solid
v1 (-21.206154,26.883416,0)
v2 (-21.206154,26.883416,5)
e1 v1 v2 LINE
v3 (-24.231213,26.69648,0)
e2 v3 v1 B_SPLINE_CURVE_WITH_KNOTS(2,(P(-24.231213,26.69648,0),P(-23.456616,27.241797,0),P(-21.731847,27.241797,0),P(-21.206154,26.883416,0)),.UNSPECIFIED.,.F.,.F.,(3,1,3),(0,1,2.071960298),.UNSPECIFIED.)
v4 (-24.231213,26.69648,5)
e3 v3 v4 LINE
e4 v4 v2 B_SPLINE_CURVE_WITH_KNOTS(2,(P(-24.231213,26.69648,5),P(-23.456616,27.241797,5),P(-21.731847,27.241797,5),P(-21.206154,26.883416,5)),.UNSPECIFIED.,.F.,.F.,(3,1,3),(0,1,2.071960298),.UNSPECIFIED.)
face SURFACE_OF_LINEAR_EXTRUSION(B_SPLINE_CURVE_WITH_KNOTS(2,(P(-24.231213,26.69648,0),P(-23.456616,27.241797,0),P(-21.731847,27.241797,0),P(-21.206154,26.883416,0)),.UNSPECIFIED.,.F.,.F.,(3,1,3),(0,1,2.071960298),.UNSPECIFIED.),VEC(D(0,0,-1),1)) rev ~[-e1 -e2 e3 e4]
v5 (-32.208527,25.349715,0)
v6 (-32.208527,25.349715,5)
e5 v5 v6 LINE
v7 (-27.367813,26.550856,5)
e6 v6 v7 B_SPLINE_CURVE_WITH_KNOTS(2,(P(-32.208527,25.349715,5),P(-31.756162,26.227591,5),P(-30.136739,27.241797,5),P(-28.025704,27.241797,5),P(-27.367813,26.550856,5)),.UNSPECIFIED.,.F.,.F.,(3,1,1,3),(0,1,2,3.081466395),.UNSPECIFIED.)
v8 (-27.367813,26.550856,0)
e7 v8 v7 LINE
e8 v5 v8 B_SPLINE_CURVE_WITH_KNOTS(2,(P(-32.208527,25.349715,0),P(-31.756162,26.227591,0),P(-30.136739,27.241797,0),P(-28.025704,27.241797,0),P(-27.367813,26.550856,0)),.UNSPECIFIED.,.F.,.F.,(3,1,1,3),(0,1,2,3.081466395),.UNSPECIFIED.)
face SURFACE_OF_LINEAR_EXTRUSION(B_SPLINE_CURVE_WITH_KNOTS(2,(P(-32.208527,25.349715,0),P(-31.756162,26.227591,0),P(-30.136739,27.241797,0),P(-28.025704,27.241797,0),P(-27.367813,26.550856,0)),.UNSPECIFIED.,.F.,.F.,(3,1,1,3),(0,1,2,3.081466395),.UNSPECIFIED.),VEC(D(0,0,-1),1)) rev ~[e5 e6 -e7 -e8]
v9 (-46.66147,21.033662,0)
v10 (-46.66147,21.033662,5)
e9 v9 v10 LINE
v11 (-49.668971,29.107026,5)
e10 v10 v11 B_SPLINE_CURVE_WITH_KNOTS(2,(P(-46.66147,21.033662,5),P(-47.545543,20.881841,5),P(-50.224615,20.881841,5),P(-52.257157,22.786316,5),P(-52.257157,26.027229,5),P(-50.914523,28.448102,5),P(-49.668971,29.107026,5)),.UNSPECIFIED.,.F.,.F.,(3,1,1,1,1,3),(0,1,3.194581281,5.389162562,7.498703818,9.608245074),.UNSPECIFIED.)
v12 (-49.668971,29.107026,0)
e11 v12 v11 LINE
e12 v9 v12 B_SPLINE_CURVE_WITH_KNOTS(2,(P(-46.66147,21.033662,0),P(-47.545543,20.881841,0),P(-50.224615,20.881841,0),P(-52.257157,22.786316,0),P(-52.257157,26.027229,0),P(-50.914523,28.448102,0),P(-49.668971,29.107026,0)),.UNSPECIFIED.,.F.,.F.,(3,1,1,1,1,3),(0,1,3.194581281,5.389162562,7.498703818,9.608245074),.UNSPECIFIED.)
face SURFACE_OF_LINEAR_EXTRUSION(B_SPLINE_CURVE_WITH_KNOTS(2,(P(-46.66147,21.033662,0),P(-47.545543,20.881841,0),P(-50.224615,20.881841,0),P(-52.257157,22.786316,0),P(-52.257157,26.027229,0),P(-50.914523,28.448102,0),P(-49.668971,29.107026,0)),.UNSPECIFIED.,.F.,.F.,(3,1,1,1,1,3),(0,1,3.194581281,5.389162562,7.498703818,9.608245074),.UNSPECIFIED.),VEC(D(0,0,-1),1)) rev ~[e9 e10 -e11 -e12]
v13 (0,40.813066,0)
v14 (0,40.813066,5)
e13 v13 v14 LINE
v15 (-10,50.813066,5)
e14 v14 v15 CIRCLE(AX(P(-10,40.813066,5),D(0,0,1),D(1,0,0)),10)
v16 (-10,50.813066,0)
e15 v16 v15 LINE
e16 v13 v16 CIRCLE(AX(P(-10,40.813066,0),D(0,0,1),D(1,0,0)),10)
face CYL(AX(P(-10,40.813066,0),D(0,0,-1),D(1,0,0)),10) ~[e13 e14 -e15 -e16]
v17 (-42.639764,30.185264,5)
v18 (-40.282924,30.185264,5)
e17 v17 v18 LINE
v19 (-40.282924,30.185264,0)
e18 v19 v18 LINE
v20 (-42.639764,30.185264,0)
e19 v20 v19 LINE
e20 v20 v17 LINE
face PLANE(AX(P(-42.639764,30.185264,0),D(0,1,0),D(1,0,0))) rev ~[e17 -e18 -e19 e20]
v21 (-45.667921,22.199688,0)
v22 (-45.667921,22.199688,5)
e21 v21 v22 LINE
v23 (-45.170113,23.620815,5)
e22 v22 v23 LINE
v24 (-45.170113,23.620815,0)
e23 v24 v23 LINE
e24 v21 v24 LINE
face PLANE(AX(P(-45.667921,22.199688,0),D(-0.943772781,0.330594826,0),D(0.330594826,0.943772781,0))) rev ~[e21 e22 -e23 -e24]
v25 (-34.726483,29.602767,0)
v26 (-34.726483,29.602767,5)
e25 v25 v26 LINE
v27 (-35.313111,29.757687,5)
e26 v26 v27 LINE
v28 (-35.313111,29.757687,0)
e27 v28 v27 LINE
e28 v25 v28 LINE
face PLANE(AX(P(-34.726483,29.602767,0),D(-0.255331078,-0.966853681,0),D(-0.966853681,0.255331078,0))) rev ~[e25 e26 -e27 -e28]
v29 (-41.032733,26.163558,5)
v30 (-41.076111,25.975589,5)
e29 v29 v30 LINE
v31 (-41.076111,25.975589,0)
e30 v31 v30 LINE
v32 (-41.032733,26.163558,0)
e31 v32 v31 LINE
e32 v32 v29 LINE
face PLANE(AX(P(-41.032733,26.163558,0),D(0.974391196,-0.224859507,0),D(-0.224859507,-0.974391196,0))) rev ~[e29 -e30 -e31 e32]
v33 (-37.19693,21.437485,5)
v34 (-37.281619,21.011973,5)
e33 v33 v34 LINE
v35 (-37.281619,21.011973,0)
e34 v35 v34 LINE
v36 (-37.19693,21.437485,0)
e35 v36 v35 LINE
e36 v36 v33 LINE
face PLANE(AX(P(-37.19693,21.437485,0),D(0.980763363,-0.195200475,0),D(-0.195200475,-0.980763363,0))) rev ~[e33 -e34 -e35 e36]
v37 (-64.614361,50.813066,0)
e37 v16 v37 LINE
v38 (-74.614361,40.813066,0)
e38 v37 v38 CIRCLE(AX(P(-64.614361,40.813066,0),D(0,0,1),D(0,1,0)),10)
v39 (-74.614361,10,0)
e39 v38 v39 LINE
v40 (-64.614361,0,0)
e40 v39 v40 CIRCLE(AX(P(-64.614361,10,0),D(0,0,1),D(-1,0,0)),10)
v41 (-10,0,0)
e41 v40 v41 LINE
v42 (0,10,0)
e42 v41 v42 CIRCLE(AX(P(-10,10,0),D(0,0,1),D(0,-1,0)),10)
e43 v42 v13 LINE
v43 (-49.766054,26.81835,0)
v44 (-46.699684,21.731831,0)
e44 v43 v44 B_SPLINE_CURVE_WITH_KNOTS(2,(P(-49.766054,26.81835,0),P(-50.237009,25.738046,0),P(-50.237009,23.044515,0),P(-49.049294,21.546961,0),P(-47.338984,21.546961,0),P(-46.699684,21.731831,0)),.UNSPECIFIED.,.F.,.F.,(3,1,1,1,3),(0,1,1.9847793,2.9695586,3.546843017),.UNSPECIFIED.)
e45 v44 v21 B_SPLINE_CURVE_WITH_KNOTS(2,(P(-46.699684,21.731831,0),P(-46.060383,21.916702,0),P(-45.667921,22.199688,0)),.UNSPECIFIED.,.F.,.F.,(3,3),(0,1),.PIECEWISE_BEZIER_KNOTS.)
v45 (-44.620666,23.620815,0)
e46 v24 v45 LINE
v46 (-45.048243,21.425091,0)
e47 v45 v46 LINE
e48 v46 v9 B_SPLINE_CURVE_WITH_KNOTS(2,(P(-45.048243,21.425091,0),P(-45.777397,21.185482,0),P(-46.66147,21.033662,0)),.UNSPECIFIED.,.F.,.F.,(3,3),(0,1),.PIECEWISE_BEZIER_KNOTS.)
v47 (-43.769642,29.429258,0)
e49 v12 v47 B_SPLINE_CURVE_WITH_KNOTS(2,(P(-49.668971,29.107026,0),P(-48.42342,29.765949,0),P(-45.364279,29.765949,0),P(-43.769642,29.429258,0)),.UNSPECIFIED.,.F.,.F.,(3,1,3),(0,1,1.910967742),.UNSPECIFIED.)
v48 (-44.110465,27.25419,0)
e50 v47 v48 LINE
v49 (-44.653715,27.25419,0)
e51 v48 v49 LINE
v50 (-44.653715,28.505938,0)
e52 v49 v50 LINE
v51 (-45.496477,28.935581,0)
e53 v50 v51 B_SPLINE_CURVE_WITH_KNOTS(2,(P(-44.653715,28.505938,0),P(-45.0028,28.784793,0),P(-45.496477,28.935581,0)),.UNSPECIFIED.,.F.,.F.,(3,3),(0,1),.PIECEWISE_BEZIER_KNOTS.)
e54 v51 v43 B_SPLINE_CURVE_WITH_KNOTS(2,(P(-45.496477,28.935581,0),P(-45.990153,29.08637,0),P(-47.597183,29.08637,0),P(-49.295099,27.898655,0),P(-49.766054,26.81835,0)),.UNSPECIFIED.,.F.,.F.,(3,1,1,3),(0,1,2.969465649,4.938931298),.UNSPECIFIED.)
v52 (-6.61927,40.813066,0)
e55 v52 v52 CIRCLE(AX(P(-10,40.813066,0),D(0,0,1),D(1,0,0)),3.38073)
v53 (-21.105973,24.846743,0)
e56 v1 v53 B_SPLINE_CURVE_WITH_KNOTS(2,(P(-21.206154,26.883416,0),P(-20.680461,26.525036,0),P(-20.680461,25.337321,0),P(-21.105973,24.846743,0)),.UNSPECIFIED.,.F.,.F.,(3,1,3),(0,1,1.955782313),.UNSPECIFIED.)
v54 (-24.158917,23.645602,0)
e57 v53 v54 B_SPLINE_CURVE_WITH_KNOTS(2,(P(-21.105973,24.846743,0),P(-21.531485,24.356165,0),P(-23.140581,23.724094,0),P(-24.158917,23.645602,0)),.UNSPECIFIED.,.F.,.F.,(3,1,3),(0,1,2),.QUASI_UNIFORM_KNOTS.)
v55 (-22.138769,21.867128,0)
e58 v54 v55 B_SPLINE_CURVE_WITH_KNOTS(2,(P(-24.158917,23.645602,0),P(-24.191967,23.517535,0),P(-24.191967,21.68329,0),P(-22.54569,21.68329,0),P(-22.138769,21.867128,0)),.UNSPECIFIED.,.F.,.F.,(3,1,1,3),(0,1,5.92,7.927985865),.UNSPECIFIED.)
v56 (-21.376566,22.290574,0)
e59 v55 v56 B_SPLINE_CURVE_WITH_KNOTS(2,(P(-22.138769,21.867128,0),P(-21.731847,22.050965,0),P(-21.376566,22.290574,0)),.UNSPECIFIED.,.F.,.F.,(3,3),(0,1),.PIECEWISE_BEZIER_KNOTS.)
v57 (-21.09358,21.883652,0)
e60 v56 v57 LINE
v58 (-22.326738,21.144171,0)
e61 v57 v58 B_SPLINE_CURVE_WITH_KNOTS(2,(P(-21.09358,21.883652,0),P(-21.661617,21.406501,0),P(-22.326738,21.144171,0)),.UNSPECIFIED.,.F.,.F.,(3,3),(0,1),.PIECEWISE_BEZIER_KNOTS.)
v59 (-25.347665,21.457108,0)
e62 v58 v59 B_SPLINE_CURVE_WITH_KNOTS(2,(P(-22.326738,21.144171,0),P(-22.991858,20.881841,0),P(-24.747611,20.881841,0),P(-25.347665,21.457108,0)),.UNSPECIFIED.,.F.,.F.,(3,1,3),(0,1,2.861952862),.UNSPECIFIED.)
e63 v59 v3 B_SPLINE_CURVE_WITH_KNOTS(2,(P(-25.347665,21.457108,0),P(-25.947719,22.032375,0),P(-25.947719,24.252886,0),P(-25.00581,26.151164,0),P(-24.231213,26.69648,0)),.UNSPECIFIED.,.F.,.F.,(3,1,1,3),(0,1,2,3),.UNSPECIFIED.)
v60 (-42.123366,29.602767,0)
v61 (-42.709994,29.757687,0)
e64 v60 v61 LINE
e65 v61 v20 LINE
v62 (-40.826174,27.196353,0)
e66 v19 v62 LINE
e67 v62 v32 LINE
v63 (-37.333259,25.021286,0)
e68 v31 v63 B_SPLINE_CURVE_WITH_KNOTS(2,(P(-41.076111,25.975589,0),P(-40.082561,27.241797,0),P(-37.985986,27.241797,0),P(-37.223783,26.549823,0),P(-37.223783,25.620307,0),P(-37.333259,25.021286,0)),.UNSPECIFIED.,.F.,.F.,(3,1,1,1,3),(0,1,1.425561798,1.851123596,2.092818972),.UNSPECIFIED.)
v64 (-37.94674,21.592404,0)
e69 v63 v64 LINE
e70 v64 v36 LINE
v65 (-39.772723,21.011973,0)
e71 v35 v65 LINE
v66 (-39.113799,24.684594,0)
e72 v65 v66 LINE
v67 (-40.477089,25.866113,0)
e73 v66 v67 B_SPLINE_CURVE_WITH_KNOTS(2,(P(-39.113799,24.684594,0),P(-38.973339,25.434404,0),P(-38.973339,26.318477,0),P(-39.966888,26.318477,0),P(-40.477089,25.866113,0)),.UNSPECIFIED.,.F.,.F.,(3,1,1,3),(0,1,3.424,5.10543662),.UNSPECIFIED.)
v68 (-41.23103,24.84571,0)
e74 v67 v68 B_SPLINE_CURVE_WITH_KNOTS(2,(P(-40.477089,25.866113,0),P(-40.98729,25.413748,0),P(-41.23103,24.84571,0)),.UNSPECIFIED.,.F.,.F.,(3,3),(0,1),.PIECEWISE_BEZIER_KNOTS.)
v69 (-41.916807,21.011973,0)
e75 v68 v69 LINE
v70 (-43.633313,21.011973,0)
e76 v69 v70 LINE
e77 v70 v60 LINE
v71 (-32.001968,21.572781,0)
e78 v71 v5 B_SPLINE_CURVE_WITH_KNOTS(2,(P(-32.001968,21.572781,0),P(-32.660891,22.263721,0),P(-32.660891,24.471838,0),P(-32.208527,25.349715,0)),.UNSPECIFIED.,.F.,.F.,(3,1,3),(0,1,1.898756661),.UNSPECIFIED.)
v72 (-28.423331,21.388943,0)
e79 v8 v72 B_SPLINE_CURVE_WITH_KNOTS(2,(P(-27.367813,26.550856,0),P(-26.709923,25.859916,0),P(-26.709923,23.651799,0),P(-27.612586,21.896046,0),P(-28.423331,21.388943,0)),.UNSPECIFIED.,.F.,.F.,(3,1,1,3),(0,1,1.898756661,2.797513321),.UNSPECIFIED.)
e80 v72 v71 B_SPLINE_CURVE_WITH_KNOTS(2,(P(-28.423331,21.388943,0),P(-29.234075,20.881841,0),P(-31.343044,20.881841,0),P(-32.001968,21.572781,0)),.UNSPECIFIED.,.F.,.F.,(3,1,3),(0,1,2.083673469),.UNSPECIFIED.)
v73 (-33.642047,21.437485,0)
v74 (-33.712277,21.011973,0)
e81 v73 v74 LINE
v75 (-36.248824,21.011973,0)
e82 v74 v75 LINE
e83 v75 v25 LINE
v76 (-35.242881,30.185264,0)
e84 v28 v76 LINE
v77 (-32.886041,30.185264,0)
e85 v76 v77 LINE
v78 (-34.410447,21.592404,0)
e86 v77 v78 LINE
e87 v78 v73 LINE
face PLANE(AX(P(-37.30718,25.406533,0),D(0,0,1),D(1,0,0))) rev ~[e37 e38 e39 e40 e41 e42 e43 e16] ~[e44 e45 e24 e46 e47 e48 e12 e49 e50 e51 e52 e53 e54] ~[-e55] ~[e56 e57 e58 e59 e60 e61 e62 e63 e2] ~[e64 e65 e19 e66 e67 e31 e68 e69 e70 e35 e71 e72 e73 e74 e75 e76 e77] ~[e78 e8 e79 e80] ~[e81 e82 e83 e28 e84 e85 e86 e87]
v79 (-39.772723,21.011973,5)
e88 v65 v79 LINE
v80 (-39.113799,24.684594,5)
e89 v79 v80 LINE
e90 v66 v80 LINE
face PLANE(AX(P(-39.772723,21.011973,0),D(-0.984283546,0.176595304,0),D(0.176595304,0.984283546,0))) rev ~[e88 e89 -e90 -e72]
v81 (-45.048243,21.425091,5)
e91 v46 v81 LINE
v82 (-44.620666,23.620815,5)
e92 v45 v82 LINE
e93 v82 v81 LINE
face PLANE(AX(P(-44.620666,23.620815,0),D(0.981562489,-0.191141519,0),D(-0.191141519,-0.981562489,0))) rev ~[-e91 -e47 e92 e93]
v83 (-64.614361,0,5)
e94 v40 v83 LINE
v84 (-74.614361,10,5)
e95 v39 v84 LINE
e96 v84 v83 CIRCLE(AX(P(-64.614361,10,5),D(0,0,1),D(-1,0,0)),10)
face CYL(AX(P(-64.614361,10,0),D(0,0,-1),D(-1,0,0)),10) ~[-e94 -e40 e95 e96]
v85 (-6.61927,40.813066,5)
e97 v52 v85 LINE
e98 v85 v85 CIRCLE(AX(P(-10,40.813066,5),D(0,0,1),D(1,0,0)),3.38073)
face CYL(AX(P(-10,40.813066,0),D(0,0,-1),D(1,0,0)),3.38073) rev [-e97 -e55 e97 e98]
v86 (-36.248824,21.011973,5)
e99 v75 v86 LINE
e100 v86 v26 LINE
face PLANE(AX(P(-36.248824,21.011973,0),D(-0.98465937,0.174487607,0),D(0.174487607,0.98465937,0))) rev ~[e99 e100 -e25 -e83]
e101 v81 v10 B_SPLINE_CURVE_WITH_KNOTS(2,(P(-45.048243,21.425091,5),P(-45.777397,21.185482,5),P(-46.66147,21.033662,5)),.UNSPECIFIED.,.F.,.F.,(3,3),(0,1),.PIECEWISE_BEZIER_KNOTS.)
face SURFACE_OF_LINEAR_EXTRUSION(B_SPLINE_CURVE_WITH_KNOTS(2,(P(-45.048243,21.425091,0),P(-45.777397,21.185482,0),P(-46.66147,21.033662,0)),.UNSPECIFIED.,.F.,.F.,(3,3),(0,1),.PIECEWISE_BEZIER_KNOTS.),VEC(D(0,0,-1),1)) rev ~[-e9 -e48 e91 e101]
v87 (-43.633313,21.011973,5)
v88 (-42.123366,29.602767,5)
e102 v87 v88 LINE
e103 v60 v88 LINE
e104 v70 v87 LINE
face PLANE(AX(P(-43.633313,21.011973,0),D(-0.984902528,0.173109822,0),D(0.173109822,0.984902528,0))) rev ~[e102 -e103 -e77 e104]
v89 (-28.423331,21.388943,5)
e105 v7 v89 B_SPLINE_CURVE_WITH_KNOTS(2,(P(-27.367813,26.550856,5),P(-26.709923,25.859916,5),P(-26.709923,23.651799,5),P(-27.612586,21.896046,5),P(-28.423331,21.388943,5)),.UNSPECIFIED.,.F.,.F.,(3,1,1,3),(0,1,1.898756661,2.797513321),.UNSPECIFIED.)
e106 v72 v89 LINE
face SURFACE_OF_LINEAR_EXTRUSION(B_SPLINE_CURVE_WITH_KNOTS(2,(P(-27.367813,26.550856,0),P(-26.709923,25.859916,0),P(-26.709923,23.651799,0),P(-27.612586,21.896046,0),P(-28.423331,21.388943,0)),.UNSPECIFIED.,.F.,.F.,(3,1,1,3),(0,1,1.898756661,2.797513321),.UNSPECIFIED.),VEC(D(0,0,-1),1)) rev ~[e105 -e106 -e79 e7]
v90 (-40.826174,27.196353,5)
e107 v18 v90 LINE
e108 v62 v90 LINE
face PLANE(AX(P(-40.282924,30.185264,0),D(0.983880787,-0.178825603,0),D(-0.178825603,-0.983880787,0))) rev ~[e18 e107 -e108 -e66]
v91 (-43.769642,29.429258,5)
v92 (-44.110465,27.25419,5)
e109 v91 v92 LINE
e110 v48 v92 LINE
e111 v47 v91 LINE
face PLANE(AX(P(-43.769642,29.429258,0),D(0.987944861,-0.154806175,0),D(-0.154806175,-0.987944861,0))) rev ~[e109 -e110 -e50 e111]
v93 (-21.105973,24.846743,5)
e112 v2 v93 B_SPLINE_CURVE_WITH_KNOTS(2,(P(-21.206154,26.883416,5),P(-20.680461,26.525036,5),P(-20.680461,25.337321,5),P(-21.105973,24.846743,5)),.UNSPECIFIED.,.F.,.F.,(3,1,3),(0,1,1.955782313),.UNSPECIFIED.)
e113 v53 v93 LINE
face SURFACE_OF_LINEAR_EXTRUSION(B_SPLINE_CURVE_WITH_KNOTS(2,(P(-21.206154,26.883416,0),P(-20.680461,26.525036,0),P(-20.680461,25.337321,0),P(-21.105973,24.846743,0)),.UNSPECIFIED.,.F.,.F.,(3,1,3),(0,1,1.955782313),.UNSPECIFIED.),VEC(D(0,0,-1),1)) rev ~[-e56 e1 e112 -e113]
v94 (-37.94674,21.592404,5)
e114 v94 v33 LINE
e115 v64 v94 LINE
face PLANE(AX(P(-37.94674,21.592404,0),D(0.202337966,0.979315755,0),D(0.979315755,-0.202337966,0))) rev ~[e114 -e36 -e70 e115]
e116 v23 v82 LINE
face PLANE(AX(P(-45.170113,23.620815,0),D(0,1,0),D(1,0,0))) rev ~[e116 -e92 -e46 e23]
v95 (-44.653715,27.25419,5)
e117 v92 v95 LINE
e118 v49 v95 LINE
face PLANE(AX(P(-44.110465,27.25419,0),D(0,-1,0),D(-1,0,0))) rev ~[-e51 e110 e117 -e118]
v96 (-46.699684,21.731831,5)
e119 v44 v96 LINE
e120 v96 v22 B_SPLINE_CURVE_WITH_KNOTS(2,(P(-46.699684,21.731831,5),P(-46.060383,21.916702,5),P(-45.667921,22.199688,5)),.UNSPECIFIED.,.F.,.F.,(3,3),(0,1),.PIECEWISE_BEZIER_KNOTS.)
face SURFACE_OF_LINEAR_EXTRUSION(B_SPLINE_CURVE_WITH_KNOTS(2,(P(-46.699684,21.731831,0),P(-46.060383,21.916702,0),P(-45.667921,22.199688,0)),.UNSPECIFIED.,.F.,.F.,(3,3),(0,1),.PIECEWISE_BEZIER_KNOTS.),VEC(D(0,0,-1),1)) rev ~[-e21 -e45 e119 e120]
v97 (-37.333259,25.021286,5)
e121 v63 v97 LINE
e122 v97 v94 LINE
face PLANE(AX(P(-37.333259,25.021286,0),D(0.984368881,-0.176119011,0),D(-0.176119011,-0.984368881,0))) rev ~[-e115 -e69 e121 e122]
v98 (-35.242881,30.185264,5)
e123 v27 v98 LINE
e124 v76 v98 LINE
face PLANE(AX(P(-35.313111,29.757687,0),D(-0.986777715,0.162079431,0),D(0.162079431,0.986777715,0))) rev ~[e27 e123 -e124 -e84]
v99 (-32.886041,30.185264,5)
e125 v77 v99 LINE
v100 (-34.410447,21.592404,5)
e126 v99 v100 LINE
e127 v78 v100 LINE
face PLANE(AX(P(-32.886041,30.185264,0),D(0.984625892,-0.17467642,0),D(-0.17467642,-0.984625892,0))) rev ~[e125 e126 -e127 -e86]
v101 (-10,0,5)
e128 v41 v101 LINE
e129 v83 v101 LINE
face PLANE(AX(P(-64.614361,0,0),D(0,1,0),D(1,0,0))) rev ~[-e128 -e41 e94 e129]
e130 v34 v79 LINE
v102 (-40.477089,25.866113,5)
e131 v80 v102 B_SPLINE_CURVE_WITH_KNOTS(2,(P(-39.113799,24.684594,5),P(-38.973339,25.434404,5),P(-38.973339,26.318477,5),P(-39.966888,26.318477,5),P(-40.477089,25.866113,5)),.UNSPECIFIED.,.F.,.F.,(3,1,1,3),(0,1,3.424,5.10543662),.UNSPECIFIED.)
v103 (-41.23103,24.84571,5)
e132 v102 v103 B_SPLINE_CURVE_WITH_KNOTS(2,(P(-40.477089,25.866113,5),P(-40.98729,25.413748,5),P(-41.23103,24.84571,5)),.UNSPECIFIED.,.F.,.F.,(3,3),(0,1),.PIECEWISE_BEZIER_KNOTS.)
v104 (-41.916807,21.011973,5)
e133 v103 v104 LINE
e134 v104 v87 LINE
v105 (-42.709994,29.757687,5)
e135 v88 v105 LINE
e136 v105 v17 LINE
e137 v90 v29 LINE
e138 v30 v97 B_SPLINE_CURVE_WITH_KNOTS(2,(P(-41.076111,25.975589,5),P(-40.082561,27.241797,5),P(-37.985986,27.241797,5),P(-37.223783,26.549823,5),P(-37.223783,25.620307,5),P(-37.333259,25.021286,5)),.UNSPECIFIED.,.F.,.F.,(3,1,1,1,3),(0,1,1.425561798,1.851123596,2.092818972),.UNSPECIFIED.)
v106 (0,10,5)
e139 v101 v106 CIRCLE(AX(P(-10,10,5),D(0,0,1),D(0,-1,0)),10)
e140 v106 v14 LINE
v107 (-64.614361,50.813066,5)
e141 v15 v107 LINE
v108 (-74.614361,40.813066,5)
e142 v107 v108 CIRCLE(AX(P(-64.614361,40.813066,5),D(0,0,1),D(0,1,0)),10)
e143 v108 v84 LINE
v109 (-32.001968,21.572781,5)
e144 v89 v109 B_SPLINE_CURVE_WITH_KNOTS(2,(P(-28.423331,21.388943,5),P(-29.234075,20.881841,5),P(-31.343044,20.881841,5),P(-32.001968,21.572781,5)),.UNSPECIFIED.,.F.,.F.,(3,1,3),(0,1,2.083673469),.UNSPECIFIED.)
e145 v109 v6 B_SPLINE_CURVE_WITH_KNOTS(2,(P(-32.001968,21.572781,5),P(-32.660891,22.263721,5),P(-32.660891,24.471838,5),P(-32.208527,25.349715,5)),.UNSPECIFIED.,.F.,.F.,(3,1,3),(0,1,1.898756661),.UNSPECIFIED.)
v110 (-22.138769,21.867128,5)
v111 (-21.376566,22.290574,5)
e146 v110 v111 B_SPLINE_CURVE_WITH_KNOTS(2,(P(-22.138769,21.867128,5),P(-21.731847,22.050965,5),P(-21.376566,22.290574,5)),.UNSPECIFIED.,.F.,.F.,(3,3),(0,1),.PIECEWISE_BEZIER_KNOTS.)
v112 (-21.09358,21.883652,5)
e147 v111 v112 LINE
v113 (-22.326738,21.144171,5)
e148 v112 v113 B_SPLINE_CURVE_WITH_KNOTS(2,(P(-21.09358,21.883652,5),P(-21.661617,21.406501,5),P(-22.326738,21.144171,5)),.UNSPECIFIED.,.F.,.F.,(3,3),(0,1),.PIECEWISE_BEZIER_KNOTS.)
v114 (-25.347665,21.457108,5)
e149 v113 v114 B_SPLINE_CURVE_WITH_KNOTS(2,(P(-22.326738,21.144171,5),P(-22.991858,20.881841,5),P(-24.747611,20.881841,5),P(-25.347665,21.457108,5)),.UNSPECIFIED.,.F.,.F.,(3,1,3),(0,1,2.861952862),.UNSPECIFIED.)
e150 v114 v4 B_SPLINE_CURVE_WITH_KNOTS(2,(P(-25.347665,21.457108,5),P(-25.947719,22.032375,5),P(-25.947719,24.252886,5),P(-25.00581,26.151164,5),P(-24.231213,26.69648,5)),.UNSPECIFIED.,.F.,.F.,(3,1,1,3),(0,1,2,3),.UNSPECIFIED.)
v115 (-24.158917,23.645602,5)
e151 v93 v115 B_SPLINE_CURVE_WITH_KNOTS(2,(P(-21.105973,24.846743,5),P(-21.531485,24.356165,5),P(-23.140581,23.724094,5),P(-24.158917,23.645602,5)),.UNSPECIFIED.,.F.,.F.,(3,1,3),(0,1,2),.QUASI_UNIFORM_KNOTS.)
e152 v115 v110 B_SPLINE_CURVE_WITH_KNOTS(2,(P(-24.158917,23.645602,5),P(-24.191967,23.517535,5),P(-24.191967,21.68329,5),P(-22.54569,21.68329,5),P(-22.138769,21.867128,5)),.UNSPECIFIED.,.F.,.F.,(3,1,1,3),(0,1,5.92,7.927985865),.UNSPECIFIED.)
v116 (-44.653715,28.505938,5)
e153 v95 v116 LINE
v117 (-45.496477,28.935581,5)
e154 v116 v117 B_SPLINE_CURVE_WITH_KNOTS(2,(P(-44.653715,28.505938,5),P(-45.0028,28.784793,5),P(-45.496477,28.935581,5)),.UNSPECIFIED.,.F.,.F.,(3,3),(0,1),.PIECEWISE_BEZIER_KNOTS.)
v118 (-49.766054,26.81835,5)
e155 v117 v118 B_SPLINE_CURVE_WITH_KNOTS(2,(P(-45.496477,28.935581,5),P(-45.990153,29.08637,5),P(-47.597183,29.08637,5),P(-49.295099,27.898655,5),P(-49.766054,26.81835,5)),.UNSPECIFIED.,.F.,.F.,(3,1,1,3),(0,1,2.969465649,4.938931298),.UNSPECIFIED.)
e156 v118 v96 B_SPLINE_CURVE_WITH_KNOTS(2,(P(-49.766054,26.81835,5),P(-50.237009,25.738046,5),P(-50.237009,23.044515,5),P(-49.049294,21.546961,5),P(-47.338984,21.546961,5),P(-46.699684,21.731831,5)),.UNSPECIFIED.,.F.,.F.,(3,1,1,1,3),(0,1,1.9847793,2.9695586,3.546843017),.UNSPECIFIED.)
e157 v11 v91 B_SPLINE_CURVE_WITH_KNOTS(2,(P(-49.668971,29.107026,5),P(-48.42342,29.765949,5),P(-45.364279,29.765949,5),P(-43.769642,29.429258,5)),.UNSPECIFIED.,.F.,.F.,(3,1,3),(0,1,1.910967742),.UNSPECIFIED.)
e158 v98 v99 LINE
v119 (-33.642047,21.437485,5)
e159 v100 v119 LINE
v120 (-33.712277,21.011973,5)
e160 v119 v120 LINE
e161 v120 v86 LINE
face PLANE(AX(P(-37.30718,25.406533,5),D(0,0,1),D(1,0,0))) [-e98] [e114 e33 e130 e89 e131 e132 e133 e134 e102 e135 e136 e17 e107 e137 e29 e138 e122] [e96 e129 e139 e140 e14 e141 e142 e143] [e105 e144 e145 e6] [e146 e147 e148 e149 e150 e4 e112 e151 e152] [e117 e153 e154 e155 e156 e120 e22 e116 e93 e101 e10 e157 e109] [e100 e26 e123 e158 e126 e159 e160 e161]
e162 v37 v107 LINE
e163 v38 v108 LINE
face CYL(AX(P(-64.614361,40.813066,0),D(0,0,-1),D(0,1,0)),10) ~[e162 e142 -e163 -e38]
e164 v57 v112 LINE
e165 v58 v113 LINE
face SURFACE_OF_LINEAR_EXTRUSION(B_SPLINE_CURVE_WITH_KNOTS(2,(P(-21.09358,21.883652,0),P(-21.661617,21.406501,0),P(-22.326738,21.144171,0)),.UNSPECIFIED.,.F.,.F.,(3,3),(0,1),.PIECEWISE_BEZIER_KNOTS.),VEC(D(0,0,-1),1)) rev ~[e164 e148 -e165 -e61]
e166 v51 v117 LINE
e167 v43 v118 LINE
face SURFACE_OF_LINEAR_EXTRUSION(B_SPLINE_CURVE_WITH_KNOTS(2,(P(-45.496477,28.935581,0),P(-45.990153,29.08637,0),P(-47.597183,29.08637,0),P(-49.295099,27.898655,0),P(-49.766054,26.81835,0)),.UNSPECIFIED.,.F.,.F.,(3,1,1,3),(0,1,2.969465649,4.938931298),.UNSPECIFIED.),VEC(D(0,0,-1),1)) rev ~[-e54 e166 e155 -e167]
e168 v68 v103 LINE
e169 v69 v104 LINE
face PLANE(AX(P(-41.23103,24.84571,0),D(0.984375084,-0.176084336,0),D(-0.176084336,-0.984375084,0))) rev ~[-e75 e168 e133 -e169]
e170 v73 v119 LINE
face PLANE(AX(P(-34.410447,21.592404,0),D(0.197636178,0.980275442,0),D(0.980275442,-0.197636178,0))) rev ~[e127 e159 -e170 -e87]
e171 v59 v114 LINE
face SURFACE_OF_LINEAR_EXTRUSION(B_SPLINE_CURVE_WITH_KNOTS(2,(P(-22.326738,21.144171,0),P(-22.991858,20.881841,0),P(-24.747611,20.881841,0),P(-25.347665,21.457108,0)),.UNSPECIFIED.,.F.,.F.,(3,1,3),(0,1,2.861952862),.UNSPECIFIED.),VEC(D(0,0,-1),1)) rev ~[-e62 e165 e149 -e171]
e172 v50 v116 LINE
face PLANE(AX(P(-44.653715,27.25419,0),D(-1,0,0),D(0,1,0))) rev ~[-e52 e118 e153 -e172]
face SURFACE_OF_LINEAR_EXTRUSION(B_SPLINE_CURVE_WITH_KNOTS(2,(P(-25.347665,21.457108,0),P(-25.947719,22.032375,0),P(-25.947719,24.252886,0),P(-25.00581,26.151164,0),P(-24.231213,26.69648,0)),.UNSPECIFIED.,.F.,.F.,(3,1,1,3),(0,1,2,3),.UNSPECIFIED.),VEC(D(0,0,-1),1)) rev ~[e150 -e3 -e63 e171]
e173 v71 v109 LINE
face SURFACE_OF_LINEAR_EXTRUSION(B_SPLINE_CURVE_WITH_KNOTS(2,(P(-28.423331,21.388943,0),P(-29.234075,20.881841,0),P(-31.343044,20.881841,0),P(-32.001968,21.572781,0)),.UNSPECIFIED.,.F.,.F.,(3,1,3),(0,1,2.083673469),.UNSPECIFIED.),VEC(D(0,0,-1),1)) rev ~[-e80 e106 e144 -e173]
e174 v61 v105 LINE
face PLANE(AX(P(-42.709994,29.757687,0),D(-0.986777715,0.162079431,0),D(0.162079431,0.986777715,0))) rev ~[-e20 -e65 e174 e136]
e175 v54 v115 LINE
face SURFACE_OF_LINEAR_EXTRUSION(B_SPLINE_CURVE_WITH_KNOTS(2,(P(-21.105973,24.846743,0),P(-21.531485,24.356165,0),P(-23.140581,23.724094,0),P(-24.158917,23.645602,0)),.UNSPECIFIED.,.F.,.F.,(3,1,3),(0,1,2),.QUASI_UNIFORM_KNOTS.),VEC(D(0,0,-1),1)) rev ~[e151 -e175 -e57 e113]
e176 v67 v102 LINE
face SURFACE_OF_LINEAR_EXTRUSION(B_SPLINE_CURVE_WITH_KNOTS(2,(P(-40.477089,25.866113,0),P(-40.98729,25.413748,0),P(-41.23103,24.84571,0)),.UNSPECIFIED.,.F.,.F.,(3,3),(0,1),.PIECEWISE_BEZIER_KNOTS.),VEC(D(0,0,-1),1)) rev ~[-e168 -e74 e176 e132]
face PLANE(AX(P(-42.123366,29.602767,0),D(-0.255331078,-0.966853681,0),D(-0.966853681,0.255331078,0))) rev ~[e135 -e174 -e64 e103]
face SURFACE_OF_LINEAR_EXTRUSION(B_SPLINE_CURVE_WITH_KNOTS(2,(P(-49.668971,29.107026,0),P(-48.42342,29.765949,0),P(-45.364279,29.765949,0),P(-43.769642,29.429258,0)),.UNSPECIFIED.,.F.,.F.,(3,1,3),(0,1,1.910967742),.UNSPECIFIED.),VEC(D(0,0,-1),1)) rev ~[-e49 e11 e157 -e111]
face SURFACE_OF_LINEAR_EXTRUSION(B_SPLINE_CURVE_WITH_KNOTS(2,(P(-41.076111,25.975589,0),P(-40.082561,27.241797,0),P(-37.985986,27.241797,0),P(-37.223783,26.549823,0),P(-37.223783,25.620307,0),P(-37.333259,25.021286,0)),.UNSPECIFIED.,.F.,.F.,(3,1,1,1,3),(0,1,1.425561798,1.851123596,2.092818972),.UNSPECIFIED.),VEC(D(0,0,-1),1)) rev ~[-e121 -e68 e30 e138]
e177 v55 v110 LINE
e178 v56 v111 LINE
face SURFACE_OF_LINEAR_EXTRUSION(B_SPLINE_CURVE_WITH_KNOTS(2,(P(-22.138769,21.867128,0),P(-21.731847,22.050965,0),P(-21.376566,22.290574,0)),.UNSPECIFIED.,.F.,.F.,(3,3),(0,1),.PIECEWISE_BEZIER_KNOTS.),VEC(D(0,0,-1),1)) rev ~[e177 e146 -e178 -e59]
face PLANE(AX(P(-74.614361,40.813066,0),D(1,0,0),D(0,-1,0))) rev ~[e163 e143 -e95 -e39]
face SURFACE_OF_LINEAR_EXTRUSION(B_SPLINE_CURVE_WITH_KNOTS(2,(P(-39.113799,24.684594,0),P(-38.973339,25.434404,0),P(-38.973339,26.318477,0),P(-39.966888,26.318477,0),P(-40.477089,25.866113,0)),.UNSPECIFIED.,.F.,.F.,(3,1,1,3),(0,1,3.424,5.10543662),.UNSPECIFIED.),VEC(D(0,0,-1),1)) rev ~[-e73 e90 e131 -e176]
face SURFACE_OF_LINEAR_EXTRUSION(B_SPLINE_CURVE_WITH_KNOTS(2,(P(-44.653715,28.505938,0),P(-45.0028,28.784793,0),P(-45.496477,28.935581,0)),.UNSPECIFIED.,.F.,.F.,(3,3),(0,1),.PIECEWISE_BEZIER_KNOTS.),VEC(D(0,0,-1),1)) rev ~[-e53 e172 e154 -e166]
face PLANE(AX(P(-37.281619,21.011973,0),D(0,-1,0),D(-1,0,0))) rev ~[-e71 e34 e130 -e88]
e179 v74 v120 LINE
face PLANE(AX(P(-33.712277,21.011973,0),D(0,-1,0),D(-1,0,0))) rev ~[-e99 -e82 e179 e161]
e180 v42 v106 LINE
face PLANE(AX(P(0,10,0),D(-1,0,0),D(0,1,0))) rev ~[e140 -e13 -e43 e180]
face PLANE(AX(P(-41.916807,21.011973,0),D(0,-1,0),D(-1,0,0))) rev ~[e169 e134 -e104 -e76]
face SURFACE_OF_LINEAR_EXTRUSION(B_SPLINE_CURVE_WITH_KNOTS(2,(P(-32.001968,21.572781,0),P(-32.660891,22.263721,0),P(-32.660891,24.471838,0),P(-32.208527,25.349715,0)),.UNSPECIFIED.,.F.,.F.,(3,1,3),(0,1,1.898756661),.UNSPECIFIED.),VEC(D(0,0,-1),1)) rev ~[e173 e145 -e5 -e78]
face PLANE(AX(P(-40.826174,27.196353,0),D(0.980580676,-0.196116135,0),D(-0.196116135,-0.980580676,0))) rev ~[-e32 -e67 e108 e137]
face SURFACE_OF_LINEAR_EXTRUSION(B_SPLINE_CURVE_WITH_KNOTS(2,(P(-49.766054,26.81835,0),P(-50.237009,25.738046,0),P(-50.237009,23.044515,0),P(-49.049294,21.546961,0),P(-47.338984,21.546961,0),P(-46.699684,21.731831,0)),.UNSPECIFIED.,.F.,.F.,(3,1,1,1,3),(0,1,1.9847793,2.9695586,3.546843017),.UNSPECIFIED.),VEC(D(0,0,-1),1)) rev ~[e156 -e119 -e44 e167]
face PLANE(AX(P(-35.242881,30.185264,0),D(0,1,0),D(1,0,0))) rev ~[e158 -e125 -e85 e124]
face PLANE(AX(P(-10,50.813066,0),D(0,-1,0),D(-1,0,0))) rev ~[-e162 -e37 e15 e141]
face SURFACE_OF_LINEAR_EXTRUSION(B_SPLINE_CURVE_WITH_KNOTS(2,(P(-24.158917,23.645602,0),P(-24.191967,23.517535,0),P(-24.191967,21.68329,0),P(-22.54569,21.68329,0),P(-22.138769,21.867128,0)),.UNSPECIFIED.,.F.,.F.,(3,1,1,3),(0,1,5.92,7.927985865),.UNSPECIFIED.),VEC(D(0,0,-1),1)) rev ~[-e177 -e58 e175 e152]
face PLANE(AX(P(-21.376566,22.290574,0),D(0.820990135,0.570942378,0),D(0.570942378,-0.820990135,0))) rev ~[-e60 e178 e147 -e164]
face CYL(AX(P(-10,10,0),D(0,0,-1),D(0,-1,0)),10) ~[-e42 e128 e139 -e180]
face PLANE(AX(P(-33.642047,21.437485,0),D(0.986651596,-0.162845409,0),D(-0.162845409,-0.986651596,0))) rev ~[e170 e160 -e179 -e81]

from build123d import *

# Parameters (mm, degrees)
F0_R     = 3.3807298635
F1_DEPTH = 5


with BuildPart() as f1:
    # F0 (on Top) → F1 (new body)
    with BuildSketch(Plane.XY):
        with BuildLine():
            Line((-64.6143609347, 0), (-10, 0))
            ThreePointArc((-10, 0), (-2.9289321881, 2.9289321881), (0, 10))
            Line((0, 10), (0, 40.8130657572))
            ThreePointArc((0, 40.8130657572), (-2.9289321881, 47.8841335691), (-10, 50.8130657572))
            Line((-10, 50.8130657572), (-64.6143609347, 50.8130657572))
            ThreePointArc((-64.6143609347, 50.8130657572), (-71.6854287466, 47.8841335691), (-74.6143609347, 40.8130657572))
            Line((-74.6143609347, 40.8130657572), (-74.6143609347, 10))
            ThreePointArc((-74.6143609347, 10), (-71.6854287466, 2.9289321881), (-64.6143609347, 0))
        make_face()
        with BuildLine():
            add(Edge.make_bspline(
                [(-46.661470066, 21.0336615097), (-47.5455431911, 20.8818405408), (-48.3841733051, 20.8818405408)],
                knots=[0, 0, 0, 1, 1, 1], degree=2))
            add(Edge.make_bspline(
                [(-48.3841733051, 20.8818405408), (-50.2246152549, 20.8818405408), (-51.2408862305, 21.8340781826)],
                knots=[0, 0, 0, 1, 1, 1], degree=2))
            add(Edge.make_bspline(
                [(-51.2408862305, 21.8340781826), (-52.2571572061, 22.7863158244), (-52.2571572061, 24.4387889555)],
                knots=[0, 0, 0, 1, 1, 1], degree=2))
            add(Edge.make_bspline(
                [(-52.2571572061, 24.4387889555), (-52.2571572061, 26.0272287528), (-51.5858399966, 27.2376653213)],
                knots=[0, 0, 0, 1, 1, 1], degree=2))
            add(Edge.make_bspline(
                [(-51.5858399966, 27.2376653213), (-50.9145227871, 28.4481018898), (-49.6689711646, 29.1070255508)],
                knots=[0, 0, 0, 1, 1, 1], degree=2))
            add(Edge.make_bspline(
                [(-49.6689711646, 29.1070255508), (-48.423419542, 29.7659492119), (-46.8225861963, 29.7659492119)],
                knots=[0, 0, 0, 1, 1, 1], degree=2))
            add(Edge.make_bspline(
                [(-46.8225861963, 29.7659492119), (-45.3642786581, 29.7659492119), (-43.7696420866, 29.4292578114)],
                knots=[0, 0, 0, 1, 1, 1], degree=2))
            Line((-43.7696420866, 29.4292578114), (-44.1104646699, 27.2541900526))
            Line((-44.1104646699, 27.2541900526), (-44.6537152117, 27.2541900526))
            Line((-44.6537152117, 27.2541900526), (-44.6537152117, 28.5059384494))
            add(Edge.make_bspline(
                [(-44.6537152117, 28.5059384494), (-45.0028001606, 28.7847932903), (-45.4964765086, 28.9355814635)],
                knots=[0, 0, 0, 1, 1, 1], degree=2))
            add(Edge.make_bspline(
                [(-45.4964765086, 28.9355814635), (-45.9901528565, 29.0863696367), (-46.5313378069, 29.0863696367)],
                knots=[0, 0, 0, 1, 1, 1], degree=2))
            add(Edge.make_bspline(
                [(-46.5313378069, 29.0863696367), (-47.5971829765, 29.0863696367), (-48.4461410476, 28.4925121052)],
                knots=[0, 0, 0, 1, 1, 1], degree=2))
            add(Edge.make_bspline(
                [(-48.4461410476, 28.4925121052), (-49.2950991187, 27.8986545737), (-49.766053961, 26.8183502643)],
                knots=[0, 0, 0, 1, 1, 1], degree=2))
            add(Edge.make_bspline(
                [(-49.766053961, 26.8183502643), (-50.2370088034, 25.7380459548), (-50.2370088034, 24.3809523959)],
                knots=[0, 0, 0, 1, 1, 1], degree=2))
            add(Edge.make_bspline(
                [(-50.2370088034, 24.3809523959), (-50.2370088034, 23.0445147511), (-49.6431512719, 22.2957378636)],
                knots=[0, 0, 0, 1, 1, 1], degree=2))
            add(Edge.make_bspline(
                [(-49.6431512719, 22.2957378636), (-49.0492937404, 21.5469609761), (-47.9710550224, 21.5469609761)],
                knots=[0, 0, 0, 1, 1, 1], degree=2))
            add(Edge.make_bspline(
                [(-47.9710550224, 21.5469609761), (-47.3389840497, 21.5469609761), (-46.6996835071, 21.7318314076)],
                knots=[0, 0, 0, 1, 1, 1], degree=2))
            add(Edge.make_bspline(
                [(-46.6996835071, 21.7318314076), (-46.0603829645, 21.9167018392), (-45.6679205959, 22.1996878629)],
                knots=[0, 0, 0, 1, 1, 1], degree=2))
            Line((-45.6679205959, 22.1996878629), (-45.1701130652, 23.6208147556))
            Line((-45.1701130652, 23.6208147556), (-44.6206657491, 23.6208147556))
            Line((-44.6206657491, 23.6208147556), (-45.0482431718, 21.4250910827))
            add(Edge.make_bspline(
                [(-45.0482431718, 21.4250910827), (-45.7773969408, 21.1854824787), (-46.661470066, 21.0336615097)],
                knots=[0, 0, 0, 1, 1, 1], degree=2))
        make_face(mode=Mode.SUBTRACT)
        with BuildLine():
            add(Edge.make_bspline(
                [(-28.4233306773, 21.3889432329), (-29.2340753072, 20.8818405408), (-30.2462151, 20.8818405408)],
                knots=[0, 0, 0, 1, 1, 1], degree=2))
            add(Edge.make_bspline(
                [(-30.2462151, 20.8818405408), (-31.3430441408, 20.8818405408), (-32.0019678018, 21.5727808688)],
                knots=[0, 0, 0, 1, 1, 1], degree=2))
            add(Edge.make_bspline(
                [(-32.0019678018, 21.5727808688), (-32.6608914628, 22.2637211967), (-32.6608914628, 23.4266491627)],
                knots=[0, 0, 0, 1, 1, 1], degree=2))
            add(Edge.make_bspline(
                [(-32.6608914628, 23.4266491627), (-32.6608914628, 24.4718384181), (-32.2085269432, 25.349714769)],
                knots=[0, 0, 0, 1, 1, 1], degree=2))
            add(Edge.make_bspline(
                [(-32.2085269432, 25.349714769), (-31.7561624235, 26.2275911199), (-30.9464505893, 26.734693812)],
                knots=[0, 0, 0, 1, 1, 1], degree=2))
            add(Edge.make_bspline(
                [(-30.9464505893, 26.734693812), (-30.1367387551, 27.2417965041), (-29.1225333709, 27.2417965041)],
                knots=[0, 0, 0, 1, 1, 1], degree=2))
            add(Edge.make_bspline(
                [(-29.1225333709, 27.2417965041), (-28.0257043301, 27.2417965041), (-27.3678134648, 26.5508561762)],
                knots=[0, 0, 0, 1, 1, 1], degree=2))
            add(Edge.make_bspline(
                [(-27.3678134648, 26.5508561762), (-26.7099225995, 25.8599158482), (-26.7099225995, 24.6969878822)],
                knots=[0, 0, 0, 1, 1, 1], degree=2))
            add(Edge.make_bspline(
                [(-26.7099225995, 24.6969878822), (-26.7099225995, 23.6517986268), (-27.1612543234, 22.7739222759)],
                knots=[0, 0, 0, 1, 1, 1], degree=2))
            add(Edge.make_bspline(
                [(-27.1612543234, 22.7739222759), (-27.6125860473, 21.896045925), (-28.4233306773, 21.3889432329)],
                knots=[0, 0, 0, 1, 1, 1], degree=2))
        make_face(mode=Mode.SUBTRACT)
        with BuildLine():
            add(Edge.make_bspline(
                [(-21.2061542772, 26.8834163938), (-20.6804612624, 26.5250362835), (-20.6804612624, 25.9177524078)],
                knots=[0, 0, 0, 1, 1, 1], degree=2))
            add(Edge.make_bspline(
                [(-20.6804612624, 25.9177524078), (-20.6804612624, 25.3373212205), (-21.1059730937, 24.8467432597)],
                knots=[0, 0, 0, 1, 1, 1], degree=2))
            add(Edge.make_bspline(
                [(-21.1059730937, 24.8467432597), (-21.5314849249, 24.3561652989), (-22.3360327806, 24.0401298126)],
                knots=[0, 0, 0, 1, 1, 1], degree=2))
            add(Edge.make_bspline(
                [(-22.3360327806, 24.0401298126), (-23.1405806363, 23.7240943263), (-24.1589172033, 23.6456018526)],
                knots=[0, 0, 0, 1, 1, 1], degree=2))
            add(Edge.make_bspline(
                [(-24.1589172033, 23.6456018526), (-24.191966666, 23.5175351849), (-24.191966666, 23.2076964728)],
                knots=[0, 0, 0, 1, 1, 1], degree=2))
            add(Edge.make_bspline(
                [(-24.191966666, 23.2076964728), (-24.191966666, 21.6832900094), (-23.0228419257, 21.6832900094)],
                knots=[0, 0, 0, 1, 1, 1], degree=2))
            add(Edge.make_bspline(
                [(-23.0228419257, 21.6832900094), (-22.5456903091, 21.6832900094), (-22.1387688006, 21.8671276452)],
                knots=[0, 0, 0, 1, 1, 1], degree=2))
            add(Edge.make_bspline(
                [(-22.1387688006, 21.8671276452), (-21.7318472921, 22.0509652811), (-21.3765655689, 22.2905738851)],
                knots=[0, 0, 0, 1, 1, 1], degree=2))
            Line((-21.3765655689, 22.2905738851), (-21.0935795452, 21.8836523765))
            add(Edge.make_bspline(
                [(-21.0935795452, 21.8836523765), (-21.661617184, 21.4065007599), (-22.3267376192, 21.1441706504)],
                knots=[0, 0, 0, 1, 1, 1], degree=2))
            add(Edge.make_bspline(
                [(-22.3267376192, 21.1441706504), (-22.9918580545, 20.8818405408), (-23.6053387044, 20.8818405408)],
                knots=[0, 0, 0, 1, 1, 1], degree=2))
            add(Edge.make_bspline(
                [(-23.6053387044, 20.8818405408), (-24.7476107563, 20.8818405408), (-25.347665062, 21.4571077496)],
                knots=[0, 0, 0, 1, 1, 1], degree=2))
            add(Edge.make_bspline(
                [(-25.347665062, 21.4571077496), (-25.9477193678, 22.0323749583), (-25.9477193678, 23.1426303433)],
                knots=[0, 0, 0, 1, 1, 1], degree=2))
            add(Edge.make_bspline(
                [(-25.9477193678, 23.1426303433), (-25.9477193678, 24.2528857282), (-25.4767645254, 25.2020249829)],
                knots=[0, 0, 0, 1, 1, 1], degree=2))
            add(Edge.make_bspline(
                [(-25.4767645254, 25.2020249829), (-25.005809683, 26.1511642376), (-24.2312129028, 26.6964803709)],
                knots=[0, 0, 0, 1, 1, 1], degree=2))
            add(Edge.make_bspline(
                [(-24.2312129028, 26.6964803709), (-23.4566161226, 27.2417965041), (-22.6241827828, 27.2417965041)],
                knots=[0, 0, 0, 1, 1, 1], degree=2))
            add(Edge.make_bspline(
                [(-22.6241827828, 27.2417965041), (-21.7318472921, 27.2417965041), (-21.2061542772, 26.8834163938)],
                knots=[0, 0, 0, 1, 1, 1], degree=2))
        make_face(mode=Mode.SUBTRACT)
        with BuildLine():
            Line((-41.0327334632, 26.1635577861), (-41.0761108829, 25.9755889674))
            add(Edge.make_bspline(
                [(-41.0761108829, 25.9755889674), (-40.0825614128, 27.2417965041), (-38.6118603262, 27.2417965041)],
                knots=[0, 0, 0, 1, 1, 1], degree=2))
            add(Edge.make_bspline(
                [(-38.6118603262, 27.2417965041), (-37.9859861278, 27.2417965041), (-37.6048845119, 26.8958099423)],
                knots=[0, 0, 0, 1, 1, 1], degree=2))
            add(Edge.make_bspline(
                [(-37.6048845119, 26.8958099423), (-37.223782896, 26.5498233805), (-37.223782896, 25.9569986447)],
                knots=[0, 0, 0, 1, 1, 1], degree=2))
            add(Edge.make_bspline(
                [(-37.223782896, 25.9569986447), (-37.223782896, 25.6203072442), (-37.333259241, 25.0212857342)],
                knots=[0, 0, 0, 1, 1, 1], degree=2))
            Line((-37.333259241, 25.0212857342), (-37.9467398909, 21.5924039872))
            Line((-37.9467398909, 21.5924039872), (-37.1969302077, 21.4374846312))
            Line((-37.1969302077, 21.4374846312), (-37.2816194556, 21.0119727999))
            Line((-37.2816194556, 21.0119727999), (-39.7727227007, 21.0119727999))
            Line((-39.7727227007, 21.0119727999), (-39.1137990397, 24.6845943337))
            add(Edge.make_bspline(
                [(-39.1137990397, 24.6845943337), (-38.9733388236, 25.434404017), (-38.9733388236, 25.6926029437)],
                knots=[0, 0, 0, 1, 1, 1], degree=2))
            add(Edge.make_bspline(
                [(-38.9733388236, 25.6926029437), (-38.9733388236, 26.3184771421), (-39.5599667851, 26.3184771421)],
                knots=[0, 0, 0, 1, 1, 1], degree=2))
            add(Edge.make_bspline(
                [(-39.5599667851, 26.3184771421), (-39.9668882936, 26.3184771421), (-40.4770893729, 25.8661126225)],
                knots=[0, 0, 0, 1, 1, 1], degree=2))
            add(Edge.make_bspline(
                [(-40.4770893729, 25.8661126225), (-40.9872904521, 25.4137481028), (-41.2310302389, 24.845710464)],
                knots=[0, 0, 0, 1, 1, 1], degree=2))
            Line((-41.2310302389, 24.845710464), (-41.9168065883, 21.0119727999))
            Line((-41.9168065883, 21.0119727999), (-43.6333130533, 21.0119727999))
            Line((-43.6333130533, 21.0119727999), (-42.1233657297, 29.6027674902))
            Line((-42.1233657297, 29.6027674902), (-42.7099936913, 29.7576868462))
            Line((-42.7099936913, 29.7576868462), (-42.6397635832, 30.1852642689))
            Line((-42.6397635832, 30.1852642689), (-40.28292378, 30.1852642689))
            Line((-40.28292378, 30.1852642689), (-40.8261743218, 27.196353493))
            Line((-40.8261743218, 27.196353493), (-41.0327334632, 26.1635577861))
        make_face(mode=Mode.SUBTRACT)
        Polygon((-32.8860409269, 30.1852642689), (-34.4104473904, 21.5924039872), (-33.6420473844, 21.4374846312), (-33.7122774925, 21.0119727999), (-36.2488237487, 21.0119727999), (-34.7264828767, 29.6027674902), (-35.3131108382, 29.7576868462), (-35.2428807301, 30.1852642689), align=None, mode=Mode.SUBTRACT)
        with Locations((-10, 40.8130657572)):
            Circle(F0_R, mode=Mode.SUBTRACT)
    extrude(amount=F1_DEPTH)


solid = f1.part
